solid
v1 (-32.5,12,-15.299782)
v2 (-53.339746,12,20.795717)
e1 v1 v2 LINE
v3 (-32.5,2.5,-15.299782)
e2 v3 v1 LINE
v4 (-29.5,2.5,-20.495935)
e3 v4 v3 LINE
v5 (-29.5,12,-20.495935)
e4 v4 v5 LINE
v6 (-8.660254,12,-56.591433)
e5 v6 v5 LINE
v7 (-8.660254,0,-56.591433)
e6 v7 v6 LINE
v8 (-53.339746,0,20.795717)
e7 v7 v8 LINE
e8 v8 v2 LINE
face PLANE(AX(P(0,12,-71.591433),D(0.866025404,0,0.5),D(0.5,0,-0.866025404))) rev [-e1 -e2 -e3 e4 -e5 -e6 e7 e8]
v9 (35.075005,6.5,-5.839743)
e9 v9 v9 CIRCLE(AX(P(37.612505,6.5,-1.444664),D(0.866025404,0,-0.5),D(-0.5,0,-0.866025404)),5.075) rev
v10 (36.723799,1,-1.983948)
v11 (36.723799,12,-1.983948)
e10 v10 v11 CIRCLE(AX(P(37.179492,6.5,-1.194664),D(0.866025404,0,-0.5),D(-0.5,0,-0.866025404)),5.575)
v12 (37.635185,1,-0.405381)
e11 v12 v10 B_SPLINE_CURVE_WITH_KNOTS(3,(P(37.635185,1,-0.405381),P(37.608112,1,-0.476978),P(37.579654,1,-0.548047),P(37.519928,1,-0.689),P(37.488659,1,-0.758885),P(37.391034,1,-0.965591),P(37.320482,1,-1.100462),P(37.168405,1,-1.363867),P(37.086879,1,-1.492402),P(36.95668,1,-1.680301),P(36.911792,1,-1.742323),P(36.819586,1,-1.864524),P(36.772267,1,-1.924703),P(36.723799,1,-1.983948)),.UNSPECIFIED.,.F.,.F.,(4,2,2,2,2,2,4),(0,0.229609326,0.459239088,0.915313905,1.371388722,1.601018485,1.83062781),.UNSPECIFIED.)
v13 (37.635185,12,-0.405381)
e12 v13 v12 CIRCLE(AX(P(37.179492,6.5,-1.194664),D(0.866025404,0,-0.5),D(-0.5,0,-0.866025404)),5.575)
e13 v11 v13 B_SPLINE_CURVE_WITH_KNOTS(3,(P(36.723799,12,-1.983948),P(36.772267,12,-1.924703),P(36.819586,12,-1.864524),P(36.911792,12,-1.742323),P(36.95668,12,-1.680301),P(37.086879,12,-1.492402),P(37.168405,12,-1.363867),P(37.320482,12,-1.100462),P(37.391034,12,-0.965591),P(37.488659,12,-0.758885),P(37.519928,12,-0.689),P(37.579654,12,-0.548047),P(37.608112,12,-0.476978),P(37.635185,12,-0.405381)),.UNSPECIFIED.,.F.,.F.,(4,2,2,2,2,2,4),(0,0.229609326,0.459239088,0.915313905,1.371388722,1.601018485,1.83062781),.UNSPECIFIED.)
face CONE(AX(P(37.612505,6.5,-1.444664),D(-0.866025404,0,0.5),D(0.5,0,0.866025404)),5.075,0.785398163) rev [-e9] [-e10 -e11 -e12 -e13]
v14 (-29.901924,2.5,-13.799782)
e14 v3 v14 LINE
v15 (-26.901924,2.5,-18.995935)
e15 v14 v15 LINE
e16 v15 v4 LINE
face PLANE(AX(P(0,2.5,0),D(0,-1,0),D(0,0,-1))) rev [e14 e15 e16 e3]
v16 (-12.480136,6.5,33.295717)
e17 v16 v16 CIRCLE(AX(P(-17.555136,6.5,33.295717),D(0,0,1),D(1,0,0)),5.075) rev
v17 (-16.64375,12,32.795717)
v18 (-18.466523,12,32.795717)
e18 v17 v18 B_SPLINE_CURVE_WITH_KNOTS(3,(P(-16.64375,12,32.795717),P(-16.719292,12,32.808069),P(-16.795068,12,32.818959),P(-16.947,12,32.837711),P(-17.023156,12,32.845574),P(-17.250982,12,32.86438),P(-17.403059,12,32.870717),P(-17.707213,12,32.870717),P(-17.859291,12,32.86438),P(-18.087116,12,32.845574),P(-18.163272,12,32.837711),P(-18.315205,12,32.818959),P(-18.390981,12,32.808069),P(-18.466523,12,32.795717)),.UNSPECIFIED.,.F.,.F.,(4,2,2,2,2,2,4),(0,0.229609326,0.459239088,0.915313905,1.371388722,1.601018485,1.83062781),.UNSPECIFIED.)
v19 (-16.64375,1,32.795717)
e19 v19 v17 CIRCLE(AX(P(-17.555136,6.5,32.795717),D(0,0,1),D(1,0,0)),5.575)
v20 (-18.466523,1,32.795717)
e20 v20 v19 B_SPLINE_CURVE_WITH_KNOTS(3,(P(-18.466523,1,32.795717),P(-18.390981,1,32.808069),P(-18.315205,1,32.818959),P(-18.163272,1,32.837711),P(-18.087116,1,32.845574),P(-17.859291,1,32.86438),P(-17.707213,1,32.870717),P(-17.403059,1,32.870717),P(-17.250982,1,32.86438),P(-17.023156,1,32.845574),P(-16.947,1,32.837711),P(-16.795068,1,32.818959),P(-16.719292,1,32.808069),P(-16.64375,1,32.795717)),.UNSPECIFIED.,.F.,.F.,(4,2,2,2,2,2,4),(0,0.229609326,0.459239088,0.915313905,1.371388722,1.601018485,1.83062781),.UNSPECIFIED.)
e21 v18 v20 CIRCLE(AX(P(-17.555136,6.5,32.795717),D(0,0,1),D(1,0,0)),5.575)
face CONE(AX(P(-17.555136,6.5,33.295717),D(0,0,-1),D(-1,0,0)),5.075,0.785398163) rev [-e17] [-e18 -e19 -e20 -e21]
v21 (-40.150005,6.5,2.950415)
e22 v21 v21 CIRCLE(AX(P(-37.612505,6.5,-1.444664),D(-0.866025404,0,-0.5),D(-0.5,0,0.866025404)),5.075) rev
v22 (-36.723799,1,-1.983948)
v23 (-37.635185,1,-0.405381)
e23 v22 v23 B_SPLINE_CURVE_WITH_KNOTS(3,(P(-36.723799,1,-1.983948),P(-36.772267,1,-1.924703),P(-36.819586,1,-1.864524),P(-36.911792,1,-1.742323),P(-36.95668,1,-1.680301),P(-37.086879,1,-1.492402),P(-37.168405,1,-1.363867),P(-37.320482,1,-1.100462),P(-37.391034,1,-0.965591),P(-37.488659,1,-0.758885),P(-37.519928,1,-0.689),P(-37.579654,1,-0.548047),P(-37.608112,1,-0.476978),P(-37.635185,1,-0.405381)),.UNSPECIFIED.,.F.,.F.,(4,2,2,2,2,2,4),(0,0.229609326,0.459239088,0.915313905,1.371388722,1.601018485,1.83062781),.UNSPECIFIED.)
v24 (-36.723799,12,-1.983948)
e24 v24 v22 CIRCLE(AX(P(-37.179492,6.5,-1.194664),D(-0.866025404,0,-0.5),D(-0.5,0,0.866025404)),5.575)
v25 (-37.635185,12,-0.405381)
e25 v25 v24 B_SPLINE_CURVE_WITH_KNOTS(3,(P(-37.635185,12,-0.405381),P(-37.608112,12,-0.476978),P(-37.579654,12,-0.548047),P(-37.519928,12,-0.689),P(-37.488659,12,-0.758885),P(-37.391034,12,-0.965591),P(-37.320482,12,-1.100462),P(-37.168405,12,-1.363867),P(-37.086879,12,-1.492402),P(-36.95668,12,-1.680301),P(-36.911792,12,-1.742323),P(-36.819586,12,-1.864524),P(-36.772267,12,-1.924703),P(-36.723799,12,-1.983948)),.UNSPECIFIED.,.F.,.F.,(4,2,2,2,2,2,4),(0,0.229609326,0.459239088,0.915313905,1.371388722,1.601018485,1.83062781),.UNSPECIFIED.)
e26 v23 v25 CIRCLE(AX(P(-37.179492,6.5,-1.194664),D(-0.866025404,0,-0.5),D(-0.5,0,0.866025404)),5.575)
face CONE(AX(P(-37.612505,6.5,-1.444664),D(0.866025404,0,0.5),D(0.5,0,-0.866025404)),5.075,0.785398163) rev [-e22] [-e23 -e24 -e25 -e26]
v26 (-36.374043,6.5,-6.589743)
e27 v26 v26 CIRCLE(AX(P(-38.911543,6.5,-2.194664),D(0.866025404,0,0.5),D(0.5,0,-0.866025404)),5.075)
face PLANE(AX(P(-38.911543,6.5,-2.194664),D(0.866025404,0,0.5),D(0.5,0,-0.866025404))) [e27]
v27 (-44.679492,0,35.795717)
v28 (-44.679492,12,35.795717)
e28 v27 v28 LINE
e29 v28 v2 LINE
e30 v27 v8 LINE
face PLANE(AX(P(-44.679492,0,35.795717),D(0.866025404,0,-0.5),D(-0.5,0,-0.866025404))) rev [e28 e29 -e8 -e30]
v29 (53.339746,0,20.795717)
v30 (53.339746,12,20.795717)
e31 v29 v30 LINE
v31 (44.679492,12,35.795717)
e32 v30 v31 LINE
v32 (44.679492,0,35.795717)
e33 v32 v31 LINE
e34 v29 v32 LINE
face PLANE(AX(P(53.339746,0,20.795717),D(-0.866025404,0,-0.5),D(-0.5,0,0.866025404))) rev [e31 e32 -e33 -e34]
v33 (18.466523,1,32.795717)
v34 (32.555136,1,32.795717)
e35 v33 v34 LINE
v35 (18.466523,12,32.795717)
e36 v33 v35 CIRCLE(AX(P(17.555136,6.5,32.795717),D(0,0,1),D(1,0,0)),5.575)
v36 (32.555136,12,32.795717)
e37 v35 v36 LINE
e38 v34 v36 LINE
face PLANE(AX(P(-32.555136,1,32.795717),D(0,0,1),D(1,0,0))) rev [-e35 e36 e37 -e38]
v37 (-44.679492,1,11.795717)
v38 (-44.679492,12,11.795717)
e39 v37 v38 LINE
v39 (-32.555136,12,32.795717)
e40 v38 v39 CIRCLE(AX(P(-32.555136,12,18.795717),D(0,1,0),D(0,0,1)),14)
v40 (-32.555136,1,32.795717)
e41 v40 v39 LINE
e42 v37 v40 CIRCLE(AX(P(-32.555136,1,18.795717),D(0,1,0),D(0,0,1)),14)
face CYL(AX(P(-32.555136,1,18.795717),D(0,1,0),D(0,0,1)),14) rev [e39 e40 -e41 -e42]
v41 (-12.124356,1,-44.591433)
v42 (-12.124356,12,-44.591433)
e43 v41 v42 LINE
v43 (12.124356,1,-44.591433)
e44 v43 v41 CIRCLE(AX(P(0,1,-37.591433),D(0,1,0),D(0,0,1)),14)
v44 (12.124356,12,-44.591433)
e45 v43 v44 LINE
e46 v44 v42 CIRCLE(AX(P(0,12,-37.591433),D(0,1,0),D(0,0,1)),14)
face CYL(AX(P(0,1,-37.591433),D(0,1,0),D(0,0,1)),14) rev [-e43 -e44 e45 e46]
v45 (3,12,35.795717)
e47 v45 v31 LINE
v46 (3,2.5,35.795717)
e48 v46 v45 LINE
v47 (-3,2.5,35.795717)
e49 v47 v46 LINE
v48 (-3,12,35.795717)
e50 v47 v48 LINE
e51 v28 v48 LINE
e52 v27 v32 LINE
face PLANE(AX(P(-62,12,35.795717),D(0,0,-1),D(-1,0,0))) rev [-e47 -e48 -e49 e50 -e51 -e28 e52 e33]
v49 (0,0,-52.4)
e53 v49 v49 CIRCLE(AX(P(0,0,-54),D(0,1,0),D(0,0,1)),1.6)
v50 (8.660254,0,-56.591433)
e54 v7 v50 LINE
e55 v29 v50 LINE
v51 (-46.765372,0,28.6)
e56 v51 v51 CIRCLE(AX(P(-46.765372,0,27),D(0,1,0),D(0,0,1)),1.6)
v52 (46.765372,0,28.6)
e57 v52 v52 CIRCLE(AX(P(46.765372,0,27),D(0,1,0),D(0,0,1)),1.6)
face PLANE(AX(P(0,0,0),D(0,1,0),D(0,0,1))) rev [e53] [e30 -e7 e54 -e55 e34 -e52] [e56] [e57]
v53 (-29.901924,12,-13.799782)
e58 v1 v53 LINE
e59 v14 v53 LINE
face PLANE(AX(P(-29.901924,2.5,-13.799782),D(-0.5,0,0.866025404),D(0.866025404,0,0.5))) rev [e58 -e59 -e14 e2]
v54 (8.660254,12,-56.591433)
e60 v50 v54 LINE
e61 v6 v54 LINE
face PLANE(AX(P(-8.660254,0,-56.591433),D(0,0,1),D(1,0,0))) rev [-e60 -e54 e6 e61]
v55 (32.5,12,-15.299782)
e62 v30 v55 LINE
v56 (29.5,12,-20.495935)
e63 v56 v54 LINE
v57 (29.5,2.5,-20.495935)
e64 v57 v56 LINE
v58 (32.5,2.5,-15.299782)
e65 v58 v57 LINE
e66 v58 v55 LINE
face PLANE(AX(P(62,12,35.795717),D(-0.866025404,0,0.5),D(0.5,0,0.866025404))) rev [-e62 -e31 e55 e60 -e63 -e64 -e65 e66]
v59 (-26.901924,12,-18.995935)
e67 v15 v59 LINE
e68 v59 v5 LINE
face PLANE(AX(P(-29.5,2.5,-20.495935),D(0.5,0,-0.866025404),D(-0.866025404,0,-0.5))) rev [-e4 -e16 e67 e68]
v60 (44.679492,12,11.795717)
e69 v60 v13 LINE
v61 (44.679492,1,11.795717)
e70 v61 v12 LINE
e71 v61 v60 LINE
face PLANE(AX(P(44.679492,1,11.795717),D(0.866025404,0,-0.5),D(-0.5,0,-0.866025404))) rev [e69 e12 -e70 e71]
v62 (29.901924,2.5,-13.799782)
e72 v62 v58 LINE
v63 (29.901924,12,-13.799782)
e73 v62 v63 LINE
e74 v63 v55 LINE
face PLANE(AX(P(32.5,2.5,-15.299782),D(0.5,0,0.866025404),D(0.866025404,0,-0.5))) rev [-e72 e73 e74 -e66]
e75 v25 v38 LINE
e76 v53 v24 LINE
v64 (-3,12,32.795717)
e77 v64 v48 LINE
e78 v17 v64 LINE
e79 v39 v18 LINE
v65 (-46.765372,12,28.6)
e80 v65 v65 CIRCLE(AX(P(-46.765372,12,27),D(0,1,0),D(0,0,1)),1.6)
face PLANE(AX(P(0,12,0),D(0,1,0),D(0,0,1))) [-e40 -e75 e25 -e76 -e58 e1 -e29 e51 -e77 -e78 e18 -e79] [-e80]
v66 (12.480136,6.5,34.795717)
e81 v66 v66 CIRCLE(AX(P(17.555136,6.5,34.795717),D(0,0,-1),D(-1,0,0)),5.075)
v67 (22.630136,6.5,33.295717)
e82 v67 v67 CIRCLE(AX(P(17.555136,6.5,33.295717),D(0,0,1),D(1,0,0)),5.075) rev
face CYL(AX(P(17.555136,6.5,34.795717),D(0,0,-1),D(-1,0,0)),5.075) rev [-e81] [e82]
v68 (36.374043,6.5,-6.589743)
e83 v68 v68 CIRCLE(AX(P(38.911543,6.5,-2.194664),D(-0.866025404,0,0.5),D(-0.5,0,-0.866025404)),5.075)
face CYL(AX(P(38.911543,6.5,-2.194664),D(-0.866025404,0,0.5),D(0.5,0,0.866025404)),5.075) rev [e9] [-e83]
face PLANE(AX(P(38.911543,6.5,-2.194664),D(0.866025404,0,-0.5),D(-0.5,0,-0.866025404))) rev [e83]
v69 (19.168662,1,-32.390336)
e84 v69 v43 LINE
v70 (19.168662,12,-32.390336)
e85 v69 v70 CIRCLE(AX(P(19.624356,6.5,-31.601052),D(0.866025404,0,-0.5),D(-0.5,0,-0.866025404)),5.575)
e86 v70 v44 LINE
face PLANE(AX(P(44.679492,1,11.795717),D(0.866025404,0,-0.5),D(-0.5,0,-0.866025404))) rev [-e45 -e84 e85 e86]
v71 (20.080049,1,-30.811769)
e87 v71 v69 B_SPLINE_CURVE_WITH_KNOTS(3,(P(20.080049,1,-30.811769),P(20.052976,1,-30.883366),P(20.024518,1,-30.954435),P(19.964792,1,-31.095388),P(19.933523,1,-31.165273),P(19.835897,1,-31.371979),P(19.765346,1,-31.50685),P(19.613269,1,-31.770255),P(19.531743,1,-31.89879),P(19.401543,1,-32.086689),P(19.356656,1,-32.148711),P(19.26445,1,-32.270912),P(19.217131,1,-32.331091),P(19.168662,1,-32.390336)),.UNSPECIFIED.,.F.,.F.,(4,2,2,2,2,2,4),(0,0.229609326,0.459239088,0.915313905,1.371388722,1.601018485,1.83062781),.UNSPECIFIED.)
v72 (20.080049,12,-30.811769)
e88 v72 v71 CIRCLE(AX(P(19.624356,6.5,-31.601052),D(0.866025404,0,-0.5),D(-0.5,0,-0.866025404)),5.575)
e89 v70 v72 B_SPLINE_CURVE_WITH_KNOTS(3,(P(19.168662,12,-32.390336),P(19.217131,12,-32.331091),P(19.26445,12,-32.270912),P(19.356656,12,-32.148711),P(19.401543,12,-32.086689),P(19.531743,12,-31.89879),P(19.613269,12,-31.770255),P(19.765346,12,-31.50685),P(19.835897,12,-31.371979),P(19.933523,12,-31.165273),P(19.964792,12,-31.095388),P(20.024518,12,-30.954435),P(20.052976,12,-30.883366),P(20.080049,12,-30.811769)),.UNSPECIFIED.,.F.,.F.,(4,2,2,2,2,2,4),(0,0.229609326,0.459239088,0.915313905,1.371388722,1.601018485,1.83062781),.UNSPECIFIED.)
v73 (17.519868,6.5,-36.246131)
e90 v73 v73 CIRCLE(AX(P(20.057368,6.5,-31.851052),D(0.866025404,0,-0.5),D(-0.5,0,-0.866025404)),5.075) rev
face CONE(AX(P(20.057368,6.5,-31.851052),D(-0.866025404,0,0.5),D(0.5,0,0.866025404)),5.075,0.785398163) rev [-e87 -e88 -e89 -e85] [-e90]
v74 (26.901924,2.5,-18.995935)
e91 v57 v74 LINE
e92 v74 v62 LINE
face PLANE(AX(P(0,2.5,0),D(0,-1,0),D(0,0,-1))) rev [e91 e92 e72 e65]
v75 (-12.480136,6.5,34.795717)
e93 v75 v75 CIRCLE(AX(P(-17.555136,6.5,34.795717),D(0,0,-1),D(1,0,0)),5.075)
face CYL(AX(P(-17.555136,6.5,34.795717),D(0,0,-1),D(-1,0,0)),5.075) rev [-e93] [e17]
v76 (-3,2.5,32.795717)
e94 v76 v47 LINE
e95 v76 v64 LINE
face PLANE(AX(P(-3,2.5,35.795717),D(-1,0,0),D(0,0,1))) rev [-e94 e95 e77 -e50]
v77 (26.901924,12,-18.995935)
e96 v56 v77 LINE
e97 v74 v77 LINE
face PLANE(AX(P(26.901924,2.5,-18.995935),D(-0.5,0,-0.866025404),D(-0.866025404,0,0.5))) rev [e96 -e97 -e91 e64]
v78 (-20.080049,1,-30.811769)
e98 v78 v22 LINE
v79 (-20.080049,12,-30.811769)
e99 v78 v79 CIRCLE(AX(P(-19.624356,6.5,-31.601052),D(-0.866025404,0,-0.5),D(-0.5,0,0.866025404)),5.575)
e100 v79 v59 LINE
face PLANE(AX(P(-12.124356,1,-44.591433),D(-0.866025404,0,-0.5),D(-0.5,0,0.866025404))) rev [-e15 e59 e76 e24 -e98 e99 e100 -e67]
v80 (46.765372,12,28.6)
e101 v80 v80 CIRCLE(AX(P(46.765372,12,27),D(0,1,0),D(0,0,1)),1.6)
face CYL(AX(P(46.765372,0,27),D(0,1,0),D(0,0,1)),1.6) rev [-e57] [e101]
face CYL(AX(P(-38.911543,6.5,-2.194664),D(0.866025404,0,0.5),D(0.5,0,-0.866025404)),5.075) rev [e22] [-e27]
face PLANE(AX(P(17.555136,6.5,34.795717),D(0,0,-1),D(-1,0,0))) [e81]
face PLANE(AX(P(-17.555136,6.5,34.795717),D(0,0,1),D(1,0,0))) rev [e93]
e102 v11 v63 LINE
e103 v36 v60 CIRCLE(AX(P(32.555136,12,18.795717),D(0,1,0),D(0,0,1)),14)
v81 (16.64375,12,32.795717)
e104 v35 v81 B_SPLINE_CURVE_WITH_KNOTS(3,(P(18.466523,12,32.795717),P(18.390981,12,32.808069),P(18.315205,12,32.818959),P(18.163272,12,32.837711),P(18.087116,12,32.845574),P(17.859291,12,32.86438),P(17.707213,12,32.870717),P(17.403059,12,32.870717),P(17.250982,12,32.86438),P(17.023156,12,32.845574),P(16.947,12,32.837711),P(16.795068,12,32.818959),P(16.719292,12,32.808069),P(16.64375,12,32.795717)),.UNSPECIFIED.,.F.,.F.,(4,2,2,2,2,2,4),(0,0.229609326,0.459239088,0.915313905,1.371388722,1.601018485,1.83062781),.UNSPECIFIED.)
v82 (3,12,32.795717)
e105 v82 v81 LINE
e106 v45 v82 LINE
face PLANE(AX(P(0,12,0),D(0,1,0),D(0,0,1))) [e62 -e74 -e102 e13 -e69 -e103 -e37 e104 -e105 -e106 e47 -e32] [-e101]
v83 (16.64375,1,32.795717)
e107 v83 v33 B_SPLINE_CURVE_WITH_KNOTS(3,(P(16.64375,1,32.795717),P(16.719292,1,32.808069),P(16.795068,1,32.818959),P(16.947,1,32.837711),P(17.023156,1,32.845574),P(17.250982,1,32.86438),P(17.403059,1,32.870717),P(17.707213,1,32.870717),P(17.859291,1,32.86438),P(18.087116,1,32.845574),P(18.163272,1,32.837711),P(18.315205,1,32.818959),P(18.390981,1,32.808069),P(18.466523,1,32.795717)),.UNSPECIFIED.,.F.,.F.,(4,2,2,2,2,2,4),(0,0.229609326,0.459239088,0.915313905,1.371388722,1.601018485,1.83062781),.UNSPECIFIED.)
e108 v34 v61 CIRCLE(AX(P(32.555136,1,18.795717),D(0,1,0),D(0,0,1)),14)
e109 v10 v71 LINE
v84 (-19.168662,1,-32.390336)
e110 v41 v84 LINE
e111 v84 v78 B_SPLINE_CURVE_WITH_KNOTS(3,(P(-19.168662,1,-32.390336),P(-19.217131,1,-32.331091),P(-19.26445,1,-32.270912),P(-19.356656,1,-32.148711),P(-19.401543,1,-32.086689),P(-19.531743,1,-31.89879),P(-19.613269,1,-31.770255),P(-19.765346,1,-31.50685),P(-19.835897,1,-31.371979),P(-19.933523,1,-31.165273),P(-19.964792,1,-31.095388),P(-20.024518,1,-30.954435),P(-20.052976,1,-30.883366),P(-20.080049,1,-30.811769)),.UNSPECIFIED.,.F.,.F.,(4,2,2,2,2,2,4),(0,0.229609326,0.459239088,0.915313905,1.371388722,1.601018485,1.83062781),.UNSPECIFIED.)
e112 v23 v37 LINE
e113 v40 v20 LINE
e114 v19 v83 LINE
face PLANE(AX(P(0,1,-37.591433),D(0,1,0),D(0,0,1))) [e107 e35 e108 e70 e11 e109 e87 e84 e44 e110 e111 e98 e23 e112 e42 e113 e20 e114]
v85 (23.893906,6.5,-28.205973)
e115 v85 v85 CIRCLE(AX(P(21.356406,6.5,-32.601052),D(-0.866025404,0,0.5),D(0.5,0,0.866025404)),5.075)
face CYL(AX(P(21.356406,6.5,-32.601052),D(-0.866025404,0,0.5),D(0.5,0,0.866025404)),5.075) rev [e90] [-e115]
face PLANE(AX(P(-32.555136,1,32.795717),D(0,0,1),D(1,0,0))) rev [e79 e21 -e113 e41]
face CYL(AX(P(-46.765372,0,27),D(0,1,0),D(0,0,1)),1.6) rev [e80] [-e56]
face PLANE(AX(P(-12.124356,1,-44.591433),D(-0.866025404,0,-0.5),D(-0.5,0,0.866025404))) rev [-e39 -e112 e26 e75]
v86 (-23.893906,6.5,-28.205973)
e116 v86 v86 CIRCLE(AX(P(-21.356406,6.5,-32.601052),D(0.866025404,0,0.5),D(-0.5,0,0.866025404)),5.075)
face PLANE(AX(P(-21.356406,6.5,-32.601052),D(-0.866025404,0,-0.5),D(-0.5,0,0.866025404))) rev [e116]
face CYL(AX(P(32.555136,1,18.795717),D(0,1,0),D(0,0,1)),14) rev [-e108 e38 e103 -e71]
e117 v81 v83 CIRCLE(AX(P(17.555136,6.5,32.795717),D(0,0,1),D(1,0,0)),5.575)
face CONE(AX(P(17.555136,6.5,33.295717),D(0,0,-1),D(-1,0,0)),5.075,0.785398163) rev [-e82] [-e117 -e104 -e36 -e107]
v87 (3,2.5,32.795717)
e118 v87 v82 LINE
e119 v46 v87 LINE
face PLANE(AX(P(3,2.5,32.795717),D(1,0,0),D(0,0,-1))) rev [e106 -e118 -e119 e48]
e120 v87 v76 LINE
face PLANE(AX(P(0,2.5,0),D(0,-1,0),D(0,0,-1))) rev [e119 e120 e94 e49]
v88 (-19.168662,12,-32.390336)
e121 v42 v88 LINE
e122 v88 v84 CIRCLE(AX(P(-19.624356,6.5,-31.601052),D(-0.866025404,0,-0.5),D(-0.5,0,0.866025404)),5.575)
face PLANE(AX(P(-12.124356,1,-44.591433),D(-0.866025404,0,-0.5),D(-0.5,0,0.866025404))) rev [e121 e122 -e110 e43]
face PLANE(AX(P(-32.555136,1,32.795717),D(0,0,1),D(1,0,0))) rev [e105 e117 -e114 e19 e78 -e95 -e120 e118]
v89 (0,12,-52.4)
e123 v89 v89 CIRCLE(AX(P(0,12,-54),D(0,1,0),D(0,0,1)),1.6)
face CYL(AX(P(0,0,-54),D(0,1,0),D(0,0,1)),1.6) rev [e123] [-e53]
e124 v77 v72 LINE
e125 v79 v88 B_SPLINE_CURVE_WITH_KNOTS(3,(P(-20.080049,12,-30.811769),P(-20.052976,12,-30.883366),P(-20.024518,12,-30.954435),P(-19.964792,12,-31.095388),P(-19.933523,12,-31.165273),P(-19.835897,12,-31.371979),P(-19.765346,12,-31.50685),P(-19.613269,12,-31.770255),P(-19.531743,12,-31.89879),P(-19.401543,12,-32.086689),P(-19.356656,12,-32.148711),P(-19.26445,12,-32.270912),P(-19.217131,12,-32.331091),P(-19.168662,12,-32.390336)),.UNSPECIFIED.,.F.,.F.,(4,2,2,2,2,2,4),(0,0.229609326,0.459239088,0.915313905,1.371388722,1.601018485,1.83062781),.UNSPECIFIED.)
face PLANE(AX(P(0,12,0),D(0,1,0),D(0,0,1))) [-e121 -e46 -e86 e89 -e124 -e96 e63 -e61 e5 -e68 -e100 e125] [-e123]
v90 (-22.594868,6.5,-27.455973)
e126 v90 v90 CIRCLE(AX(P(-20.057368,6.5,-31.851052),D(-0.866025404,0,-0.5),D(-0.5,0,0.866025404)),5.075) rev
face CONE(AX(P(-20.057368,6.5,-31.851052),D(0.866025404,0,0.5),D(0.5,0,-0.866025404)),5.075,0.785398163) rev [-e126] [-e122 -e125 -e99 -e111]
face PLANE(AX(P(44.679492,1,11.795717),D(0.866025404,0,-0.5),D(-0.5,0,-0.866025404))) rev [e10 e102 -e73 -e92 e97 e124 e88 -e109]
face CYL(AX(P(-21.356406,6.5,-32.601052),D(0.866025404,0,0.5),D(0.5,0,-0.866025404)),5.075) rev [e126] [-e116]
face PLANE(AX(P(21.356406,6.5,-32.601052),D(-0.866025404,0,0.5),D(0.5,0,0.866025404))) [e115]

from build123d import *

# Parameters (mm, degrees)
BOSS_EXTRU_1_DEPTH           = 12
ESQUISSE10_R                 = 1.6
ENL_V_MAT_EXTRU_6_DEPTH      = 96.463780217
ENL_V_MAT_EXTRU_1_DEPTH      = 96.463780217
ENL_V_MAT_EXTRU_2_DEPTH      = 11
ESQUISSE4_W                  = 6
ESQUISSE4_H                  = 3
ENL_V_MAT_EXTRU_3_DEPTH      = 9.5
ESQUISSE11_R                 = 5.075
ENL_V_MAT_EXTRU_7_DEPTH      = 2
R_P_TITION_CIRCULAIRE1_COUNT = 3
CHANFREIN1_SIZE              = 0.5


with BuildPart() as part:
    # Esquisse1 → Boss.-Extru.1 (new body)
    with BuildSketch(Plane(origin=(0, 0, 0), x_dir=(1, 0, 0), z_dir=(0, 1, 0))):
        Polygon((-62, -35.79571669), (62, -35.79571669), (0, 71.59143338), align=None)
    extrude(amount=BOSS_EXTRU_1_DEPTH)

    # Esquisse10 → Enlèv. mat.-Extru.6 (cut, through all)
    with BuildSketch(Plane(origin=(0, 12, 0), x_dir=(1, 0, 0), z_dir=(0, 1, 0))):
        with Locations(Location((0, 54, 0), (0, 0, 270))):
            Circle(ESQUISSE10_R)
        with Locations(Location((46.765371804, -27, 0), (0, 0, 270))):
            Circle(ESQUISSE10_R)
        with Locations(Location((-46.765371804, -27, 0), (0, 0, 270))):
            Circle(ESQUISSE10_R)
    extrude(amount=-ENL_V_MAT_EXTRU_6_DEPTH, mode=Mode.SUBTRACT)

    # Esquisse2 → Enlèv. mat.-Extru.1 (cut, through all)
    with BuildSketch(Plane(origin=(0, 12, 0), x_dir=(1, 0, 0), z_dir=(0, 1, 0))):
        Polygon((-8.660254038, 56.59143338), (8.660254038, 56.59143338), (0, 71.59143338), align=None)
        Polygon((62, -35.79571669), (53.339745962, -20.79571669), (44.679491924, -35.79571669), align=None)
        Polygon((-62, -35.79571669), (-44.679491924, -35.79571669), (-53.339745962, -20.79571669), align=None)
    extrude(amount=-ENL_V_MAT_EXTRU_1_DEPTH, mode=Mode.SUBTRACT)

    # Esquisse3 → Enlèv. mat.-Extru.2 (cut)
    with BuildSketch(Plane(origin=(0, 12, 0), x_dir=(1, 0, 0), z_dir=(0, 1, 0))):
        with BuildLine():
            Line((44.679491924, -11.79571669), (12.124355653, 44.59143338))
            ThreePointArc((12.124355653, 44.59143338), (0, 51.59143338), (-12.124355653, 44.59143338))
            Line((-12.124355653, 44.59143338), (-44.679491924, -11.79571669))
            ThreePointArc((-44.679491924, -11.79571669), (-44.679491924, -25.79571669), (-32.555136271, -32.79571669))
            Line((-32.555136271, -32.79571669), (32.555136271, -32.79571669))
            ThreePointArc((32.555136271, -32.79571669), (44.679491924, -25.79571669), (44.679491924, -11.79571669))
        make_face()
    extrude(amount=-ENL_V_MAT_EXTRU_2_DEPTH, mode=Mode.SUBTRACT)

    # Esquisse4 → Enlèv. mat.-Extru.3 (cut)
    with BuildSketch(Plane(origin=(0, 12, 0), x_dir=(1, 0, 0), z_dir=(0, 1, 0))):
        Polygon((29.901923789, 13.799782134), (26.901923789, 18.995934556), (29.5, 20.495934556), (32.5, 15.299782134), align=None)
        with Locations((0, -34.29571669)):
            Rectangle(ESQUISSE4_W, ESQUISSE4_H)
        Polygon((-29.5, 20.495934556), (-26.901923789, 18.995934556), (-29.901923789, 13.799782134), (-32.5, 15.299782134), align=None)
    extrude(amount=-ENL_V_MAT_EXTRU_3_DEPTH, mode=Mode.SUBTRACT)

    # Esquisse11 → Enlèv. mat.-Extru.7 (cut)
    with BuildSketch(Plane(origin=(0, 0, 32.79571669), x_dir=(-1, 0, 0), z_dir=(0, 0, -1))):
        with Locations((-17.555136271, 6.5)):
            Circle(ESQUISSE11_R)
        with Locations(Location((17.555136271, 6.5, 0), (0, 0, 180))):
            Circle(ESQUISSE11_R)
    enl_v_mat_extru_7 = extrude(amount=-ENL_V_MAT_EXTRU_7_DEPTH, mode=Mode.SUBTRACT)

    # Répétition circulaire1: Enlèv. mat.-Extru.7 ×3 about axis
    r_p_tition_circulaire1_axis = Axis((0, 0, 0), (0, 1, 0))
    for i in range(1, R_P_TITION_CIRCULAIRE1_COUNT):
        add(enl_v_mat_extru_7.rotate(r_p_tition_circulaire1_axis, i * 360 / R_P_TITION_CIRCULAIRE1_COUNT), mode=Mode.SUBTRACT)

    # Chanfrein1
    # the kernel refuses this chamfer: 0.5 mm, written as the material it takes off along each edge
    with BuildSketch(Plane(origin=(17.555136271, 6.5, 32.79571669), x_dir=(-1, 0, 0), z_dir=(0, -1, 0))) as chanfrein1_piece_1_section:
        Polygon((5.075 + CHANFREIN1_SIZE, 0), (5.075, -CHANFREIN1_SIZE), (5.075, 0), align=None)
    chanfrein1_piece_1 = revolve(axis=Axis((17.555136271, 6.5, 32.79571669), (0, 0, -1)), mode=Mode.PRIVATE)
    chanfrein1_piece_1 = split(chanfrein1_piece_1, bisect_by=Plane(origin=(22.868441697, 1, 33.034022115), z_dir=(0, 1, 0)), keep=Keep.TOP, mode=Mode.PRIVATE)
    add(chanfrein1_piece_1, mode=Mode.SUBTRACT)
    with BuildSketch(Plane(origin=(-17.555136271, 6.5, 32.79571669), x_dir=(1, 0, 0), z_dir=(0, 1, 0))) as chanfrein1_piece_2_section:
        Polygon((5.075 + CHANFREIN1_SIZE, 0), (5.075, -CHANFREIN1_SIZE), (5.075, 0), align=None)
    chanfrein1_piece_2 = revolve(axis=Axis((-17.555136271, 6.5, 32.79571669), (0, 0, -1)), mode=Mode.PRIVATE)
    chanfrein1_piece_2 = split(chanfrein1_piece_2, bisect_by=Plane(origin=(-22.868441724, 1, 33.034022142), z_dir=(0, 1, 0)), keep=Keep.TOP, mode=Mode.PRIVATE)
    add(chanfrein1_piece_2, mode=Mode.SUBTRACT)
    with BuildSketch(Plane(origin=(-19.624355653, 6.5, -31.601052323), x_dir=(-0.5000000000000007, 0, 0.8660254037844384), z_dir=(0, 1, 0))) as chanfrein1_piece_3_section:
        Polygon((5.075 + CHANFREIN1_SIZE, 0), (5.075, -CHANFREIN1_SIZE), (5.075, 0), align=None)
    chanfrein1_piece_3 = revolve(axis=Axis((-19.624355653, 6.5, -31.601052323), (0.8660254037844384, 0, 0.5000000000000004)), mode=Mode.PRIVATE)
    chanfrein1_piece_3 = split(chanfrein1_piece_3, bisect_by=Plane(origin=(-17.174081503, 1, -36.32166255), z_dir=(0, 1, 0)), keep=Keep.TOP, mode=Mode.PRIVATE)
    add(chanfrein1_piece_3, mode=Mode.SUBTRACT)
    with BuildSketch(Plane(origin=(-37.179491924, 6.5, -1.194664367), x_dir=(0.4999999999999994, 0, -0.866025403784439), z_dir=(0, -1, 0))) as chanfrein1_piece_4_section:
        Polygon((5.075 + CHANFREIN1_SIZE, 0), (5.075, -CHANFREIN1_SIZE), (5.075, 0), align=None)
    chanfrein1_piece_4 = revolve(axis=Axis((-37.179491924, 6.5, -1.194664367), (0.8660254037844384, 0, 0.5000000000000004)), mode=Mode.PRIVATE)
    chanfrein1_piece_4 = split(chanfrein1_piece_4, bisect_by=Plane(origin=(-40.04252319, 1, 3.287640397), z_dir=(0, 1, 0)), keep=Keep.TOP, mode=Mode.PRIVATE)
    add(chanfrein1_piece_4, mode=Mode.SUBTRACT)
    with BuildSketch(Plane(origin=(37.179491924, 6.5, -1.194664367), x_dir=(-0.4999999999999992, 0, -0.866025403784439), z_dir=(0, 1, 0))) as chanfrein1_piece_5_section:
        Polygon((5.075 + CHANFREIN1_SIZE, 0), (5.075, -CHANFREIN1_SIZE), (5.075, 0), align=None)
    chanfrein1_piece_5 = revolve(axis=Axis((37.179491924, 6.5, -1.194664367), (-0.8660254037844388, 0, 0.49999999999999983)), mode=Mode.PRIVATE)
    chanfrein1_piece_5 = split(chanfrein1_piece_5, bisect_by=Plane(origin=(40.042523227, 1, 3.287640407), z_dir=(0, 1, 0)), keep=Keep.TOP, mode=Mode.PRIVATE)
    add(chanfrein1_piece_5, mode=Mode.SUBTRACT)
    with BuildSketch(Plane(origin=(19.624355653, 6.5, -31.601052323), x_dir=(0.4999999999999997, 0, 0.8660254037844387), z_dir=(0, -1, 0))) as chanfrein1_piece_6_section:
        Polygon((5.075 + CHANFREIN1_SIZE, 0), (5.075, -CHANFREIN1_SIZE), (5.075, 0), align=None)
    chanfrein1_piece_6 = revolve(axis=Axis((19.624355653, 6.5, -31.601052323), (-0.8660254037844388, 0, 0.49999999999999983)), mode=Mode.PRIVATE)
    chanfrein1_piece_6 = split(chanfrein1_piece_6, bisect_by=Plane(origin=(17.174081493, 1, -36.321662513), z_dir=(0, 1, 0)), keep=Keep.TOP, mode=Mode.PRIVATE)
    add(chanfrein1_piece_6, mode=Mode.SUBTRACT)


solid = part.part
